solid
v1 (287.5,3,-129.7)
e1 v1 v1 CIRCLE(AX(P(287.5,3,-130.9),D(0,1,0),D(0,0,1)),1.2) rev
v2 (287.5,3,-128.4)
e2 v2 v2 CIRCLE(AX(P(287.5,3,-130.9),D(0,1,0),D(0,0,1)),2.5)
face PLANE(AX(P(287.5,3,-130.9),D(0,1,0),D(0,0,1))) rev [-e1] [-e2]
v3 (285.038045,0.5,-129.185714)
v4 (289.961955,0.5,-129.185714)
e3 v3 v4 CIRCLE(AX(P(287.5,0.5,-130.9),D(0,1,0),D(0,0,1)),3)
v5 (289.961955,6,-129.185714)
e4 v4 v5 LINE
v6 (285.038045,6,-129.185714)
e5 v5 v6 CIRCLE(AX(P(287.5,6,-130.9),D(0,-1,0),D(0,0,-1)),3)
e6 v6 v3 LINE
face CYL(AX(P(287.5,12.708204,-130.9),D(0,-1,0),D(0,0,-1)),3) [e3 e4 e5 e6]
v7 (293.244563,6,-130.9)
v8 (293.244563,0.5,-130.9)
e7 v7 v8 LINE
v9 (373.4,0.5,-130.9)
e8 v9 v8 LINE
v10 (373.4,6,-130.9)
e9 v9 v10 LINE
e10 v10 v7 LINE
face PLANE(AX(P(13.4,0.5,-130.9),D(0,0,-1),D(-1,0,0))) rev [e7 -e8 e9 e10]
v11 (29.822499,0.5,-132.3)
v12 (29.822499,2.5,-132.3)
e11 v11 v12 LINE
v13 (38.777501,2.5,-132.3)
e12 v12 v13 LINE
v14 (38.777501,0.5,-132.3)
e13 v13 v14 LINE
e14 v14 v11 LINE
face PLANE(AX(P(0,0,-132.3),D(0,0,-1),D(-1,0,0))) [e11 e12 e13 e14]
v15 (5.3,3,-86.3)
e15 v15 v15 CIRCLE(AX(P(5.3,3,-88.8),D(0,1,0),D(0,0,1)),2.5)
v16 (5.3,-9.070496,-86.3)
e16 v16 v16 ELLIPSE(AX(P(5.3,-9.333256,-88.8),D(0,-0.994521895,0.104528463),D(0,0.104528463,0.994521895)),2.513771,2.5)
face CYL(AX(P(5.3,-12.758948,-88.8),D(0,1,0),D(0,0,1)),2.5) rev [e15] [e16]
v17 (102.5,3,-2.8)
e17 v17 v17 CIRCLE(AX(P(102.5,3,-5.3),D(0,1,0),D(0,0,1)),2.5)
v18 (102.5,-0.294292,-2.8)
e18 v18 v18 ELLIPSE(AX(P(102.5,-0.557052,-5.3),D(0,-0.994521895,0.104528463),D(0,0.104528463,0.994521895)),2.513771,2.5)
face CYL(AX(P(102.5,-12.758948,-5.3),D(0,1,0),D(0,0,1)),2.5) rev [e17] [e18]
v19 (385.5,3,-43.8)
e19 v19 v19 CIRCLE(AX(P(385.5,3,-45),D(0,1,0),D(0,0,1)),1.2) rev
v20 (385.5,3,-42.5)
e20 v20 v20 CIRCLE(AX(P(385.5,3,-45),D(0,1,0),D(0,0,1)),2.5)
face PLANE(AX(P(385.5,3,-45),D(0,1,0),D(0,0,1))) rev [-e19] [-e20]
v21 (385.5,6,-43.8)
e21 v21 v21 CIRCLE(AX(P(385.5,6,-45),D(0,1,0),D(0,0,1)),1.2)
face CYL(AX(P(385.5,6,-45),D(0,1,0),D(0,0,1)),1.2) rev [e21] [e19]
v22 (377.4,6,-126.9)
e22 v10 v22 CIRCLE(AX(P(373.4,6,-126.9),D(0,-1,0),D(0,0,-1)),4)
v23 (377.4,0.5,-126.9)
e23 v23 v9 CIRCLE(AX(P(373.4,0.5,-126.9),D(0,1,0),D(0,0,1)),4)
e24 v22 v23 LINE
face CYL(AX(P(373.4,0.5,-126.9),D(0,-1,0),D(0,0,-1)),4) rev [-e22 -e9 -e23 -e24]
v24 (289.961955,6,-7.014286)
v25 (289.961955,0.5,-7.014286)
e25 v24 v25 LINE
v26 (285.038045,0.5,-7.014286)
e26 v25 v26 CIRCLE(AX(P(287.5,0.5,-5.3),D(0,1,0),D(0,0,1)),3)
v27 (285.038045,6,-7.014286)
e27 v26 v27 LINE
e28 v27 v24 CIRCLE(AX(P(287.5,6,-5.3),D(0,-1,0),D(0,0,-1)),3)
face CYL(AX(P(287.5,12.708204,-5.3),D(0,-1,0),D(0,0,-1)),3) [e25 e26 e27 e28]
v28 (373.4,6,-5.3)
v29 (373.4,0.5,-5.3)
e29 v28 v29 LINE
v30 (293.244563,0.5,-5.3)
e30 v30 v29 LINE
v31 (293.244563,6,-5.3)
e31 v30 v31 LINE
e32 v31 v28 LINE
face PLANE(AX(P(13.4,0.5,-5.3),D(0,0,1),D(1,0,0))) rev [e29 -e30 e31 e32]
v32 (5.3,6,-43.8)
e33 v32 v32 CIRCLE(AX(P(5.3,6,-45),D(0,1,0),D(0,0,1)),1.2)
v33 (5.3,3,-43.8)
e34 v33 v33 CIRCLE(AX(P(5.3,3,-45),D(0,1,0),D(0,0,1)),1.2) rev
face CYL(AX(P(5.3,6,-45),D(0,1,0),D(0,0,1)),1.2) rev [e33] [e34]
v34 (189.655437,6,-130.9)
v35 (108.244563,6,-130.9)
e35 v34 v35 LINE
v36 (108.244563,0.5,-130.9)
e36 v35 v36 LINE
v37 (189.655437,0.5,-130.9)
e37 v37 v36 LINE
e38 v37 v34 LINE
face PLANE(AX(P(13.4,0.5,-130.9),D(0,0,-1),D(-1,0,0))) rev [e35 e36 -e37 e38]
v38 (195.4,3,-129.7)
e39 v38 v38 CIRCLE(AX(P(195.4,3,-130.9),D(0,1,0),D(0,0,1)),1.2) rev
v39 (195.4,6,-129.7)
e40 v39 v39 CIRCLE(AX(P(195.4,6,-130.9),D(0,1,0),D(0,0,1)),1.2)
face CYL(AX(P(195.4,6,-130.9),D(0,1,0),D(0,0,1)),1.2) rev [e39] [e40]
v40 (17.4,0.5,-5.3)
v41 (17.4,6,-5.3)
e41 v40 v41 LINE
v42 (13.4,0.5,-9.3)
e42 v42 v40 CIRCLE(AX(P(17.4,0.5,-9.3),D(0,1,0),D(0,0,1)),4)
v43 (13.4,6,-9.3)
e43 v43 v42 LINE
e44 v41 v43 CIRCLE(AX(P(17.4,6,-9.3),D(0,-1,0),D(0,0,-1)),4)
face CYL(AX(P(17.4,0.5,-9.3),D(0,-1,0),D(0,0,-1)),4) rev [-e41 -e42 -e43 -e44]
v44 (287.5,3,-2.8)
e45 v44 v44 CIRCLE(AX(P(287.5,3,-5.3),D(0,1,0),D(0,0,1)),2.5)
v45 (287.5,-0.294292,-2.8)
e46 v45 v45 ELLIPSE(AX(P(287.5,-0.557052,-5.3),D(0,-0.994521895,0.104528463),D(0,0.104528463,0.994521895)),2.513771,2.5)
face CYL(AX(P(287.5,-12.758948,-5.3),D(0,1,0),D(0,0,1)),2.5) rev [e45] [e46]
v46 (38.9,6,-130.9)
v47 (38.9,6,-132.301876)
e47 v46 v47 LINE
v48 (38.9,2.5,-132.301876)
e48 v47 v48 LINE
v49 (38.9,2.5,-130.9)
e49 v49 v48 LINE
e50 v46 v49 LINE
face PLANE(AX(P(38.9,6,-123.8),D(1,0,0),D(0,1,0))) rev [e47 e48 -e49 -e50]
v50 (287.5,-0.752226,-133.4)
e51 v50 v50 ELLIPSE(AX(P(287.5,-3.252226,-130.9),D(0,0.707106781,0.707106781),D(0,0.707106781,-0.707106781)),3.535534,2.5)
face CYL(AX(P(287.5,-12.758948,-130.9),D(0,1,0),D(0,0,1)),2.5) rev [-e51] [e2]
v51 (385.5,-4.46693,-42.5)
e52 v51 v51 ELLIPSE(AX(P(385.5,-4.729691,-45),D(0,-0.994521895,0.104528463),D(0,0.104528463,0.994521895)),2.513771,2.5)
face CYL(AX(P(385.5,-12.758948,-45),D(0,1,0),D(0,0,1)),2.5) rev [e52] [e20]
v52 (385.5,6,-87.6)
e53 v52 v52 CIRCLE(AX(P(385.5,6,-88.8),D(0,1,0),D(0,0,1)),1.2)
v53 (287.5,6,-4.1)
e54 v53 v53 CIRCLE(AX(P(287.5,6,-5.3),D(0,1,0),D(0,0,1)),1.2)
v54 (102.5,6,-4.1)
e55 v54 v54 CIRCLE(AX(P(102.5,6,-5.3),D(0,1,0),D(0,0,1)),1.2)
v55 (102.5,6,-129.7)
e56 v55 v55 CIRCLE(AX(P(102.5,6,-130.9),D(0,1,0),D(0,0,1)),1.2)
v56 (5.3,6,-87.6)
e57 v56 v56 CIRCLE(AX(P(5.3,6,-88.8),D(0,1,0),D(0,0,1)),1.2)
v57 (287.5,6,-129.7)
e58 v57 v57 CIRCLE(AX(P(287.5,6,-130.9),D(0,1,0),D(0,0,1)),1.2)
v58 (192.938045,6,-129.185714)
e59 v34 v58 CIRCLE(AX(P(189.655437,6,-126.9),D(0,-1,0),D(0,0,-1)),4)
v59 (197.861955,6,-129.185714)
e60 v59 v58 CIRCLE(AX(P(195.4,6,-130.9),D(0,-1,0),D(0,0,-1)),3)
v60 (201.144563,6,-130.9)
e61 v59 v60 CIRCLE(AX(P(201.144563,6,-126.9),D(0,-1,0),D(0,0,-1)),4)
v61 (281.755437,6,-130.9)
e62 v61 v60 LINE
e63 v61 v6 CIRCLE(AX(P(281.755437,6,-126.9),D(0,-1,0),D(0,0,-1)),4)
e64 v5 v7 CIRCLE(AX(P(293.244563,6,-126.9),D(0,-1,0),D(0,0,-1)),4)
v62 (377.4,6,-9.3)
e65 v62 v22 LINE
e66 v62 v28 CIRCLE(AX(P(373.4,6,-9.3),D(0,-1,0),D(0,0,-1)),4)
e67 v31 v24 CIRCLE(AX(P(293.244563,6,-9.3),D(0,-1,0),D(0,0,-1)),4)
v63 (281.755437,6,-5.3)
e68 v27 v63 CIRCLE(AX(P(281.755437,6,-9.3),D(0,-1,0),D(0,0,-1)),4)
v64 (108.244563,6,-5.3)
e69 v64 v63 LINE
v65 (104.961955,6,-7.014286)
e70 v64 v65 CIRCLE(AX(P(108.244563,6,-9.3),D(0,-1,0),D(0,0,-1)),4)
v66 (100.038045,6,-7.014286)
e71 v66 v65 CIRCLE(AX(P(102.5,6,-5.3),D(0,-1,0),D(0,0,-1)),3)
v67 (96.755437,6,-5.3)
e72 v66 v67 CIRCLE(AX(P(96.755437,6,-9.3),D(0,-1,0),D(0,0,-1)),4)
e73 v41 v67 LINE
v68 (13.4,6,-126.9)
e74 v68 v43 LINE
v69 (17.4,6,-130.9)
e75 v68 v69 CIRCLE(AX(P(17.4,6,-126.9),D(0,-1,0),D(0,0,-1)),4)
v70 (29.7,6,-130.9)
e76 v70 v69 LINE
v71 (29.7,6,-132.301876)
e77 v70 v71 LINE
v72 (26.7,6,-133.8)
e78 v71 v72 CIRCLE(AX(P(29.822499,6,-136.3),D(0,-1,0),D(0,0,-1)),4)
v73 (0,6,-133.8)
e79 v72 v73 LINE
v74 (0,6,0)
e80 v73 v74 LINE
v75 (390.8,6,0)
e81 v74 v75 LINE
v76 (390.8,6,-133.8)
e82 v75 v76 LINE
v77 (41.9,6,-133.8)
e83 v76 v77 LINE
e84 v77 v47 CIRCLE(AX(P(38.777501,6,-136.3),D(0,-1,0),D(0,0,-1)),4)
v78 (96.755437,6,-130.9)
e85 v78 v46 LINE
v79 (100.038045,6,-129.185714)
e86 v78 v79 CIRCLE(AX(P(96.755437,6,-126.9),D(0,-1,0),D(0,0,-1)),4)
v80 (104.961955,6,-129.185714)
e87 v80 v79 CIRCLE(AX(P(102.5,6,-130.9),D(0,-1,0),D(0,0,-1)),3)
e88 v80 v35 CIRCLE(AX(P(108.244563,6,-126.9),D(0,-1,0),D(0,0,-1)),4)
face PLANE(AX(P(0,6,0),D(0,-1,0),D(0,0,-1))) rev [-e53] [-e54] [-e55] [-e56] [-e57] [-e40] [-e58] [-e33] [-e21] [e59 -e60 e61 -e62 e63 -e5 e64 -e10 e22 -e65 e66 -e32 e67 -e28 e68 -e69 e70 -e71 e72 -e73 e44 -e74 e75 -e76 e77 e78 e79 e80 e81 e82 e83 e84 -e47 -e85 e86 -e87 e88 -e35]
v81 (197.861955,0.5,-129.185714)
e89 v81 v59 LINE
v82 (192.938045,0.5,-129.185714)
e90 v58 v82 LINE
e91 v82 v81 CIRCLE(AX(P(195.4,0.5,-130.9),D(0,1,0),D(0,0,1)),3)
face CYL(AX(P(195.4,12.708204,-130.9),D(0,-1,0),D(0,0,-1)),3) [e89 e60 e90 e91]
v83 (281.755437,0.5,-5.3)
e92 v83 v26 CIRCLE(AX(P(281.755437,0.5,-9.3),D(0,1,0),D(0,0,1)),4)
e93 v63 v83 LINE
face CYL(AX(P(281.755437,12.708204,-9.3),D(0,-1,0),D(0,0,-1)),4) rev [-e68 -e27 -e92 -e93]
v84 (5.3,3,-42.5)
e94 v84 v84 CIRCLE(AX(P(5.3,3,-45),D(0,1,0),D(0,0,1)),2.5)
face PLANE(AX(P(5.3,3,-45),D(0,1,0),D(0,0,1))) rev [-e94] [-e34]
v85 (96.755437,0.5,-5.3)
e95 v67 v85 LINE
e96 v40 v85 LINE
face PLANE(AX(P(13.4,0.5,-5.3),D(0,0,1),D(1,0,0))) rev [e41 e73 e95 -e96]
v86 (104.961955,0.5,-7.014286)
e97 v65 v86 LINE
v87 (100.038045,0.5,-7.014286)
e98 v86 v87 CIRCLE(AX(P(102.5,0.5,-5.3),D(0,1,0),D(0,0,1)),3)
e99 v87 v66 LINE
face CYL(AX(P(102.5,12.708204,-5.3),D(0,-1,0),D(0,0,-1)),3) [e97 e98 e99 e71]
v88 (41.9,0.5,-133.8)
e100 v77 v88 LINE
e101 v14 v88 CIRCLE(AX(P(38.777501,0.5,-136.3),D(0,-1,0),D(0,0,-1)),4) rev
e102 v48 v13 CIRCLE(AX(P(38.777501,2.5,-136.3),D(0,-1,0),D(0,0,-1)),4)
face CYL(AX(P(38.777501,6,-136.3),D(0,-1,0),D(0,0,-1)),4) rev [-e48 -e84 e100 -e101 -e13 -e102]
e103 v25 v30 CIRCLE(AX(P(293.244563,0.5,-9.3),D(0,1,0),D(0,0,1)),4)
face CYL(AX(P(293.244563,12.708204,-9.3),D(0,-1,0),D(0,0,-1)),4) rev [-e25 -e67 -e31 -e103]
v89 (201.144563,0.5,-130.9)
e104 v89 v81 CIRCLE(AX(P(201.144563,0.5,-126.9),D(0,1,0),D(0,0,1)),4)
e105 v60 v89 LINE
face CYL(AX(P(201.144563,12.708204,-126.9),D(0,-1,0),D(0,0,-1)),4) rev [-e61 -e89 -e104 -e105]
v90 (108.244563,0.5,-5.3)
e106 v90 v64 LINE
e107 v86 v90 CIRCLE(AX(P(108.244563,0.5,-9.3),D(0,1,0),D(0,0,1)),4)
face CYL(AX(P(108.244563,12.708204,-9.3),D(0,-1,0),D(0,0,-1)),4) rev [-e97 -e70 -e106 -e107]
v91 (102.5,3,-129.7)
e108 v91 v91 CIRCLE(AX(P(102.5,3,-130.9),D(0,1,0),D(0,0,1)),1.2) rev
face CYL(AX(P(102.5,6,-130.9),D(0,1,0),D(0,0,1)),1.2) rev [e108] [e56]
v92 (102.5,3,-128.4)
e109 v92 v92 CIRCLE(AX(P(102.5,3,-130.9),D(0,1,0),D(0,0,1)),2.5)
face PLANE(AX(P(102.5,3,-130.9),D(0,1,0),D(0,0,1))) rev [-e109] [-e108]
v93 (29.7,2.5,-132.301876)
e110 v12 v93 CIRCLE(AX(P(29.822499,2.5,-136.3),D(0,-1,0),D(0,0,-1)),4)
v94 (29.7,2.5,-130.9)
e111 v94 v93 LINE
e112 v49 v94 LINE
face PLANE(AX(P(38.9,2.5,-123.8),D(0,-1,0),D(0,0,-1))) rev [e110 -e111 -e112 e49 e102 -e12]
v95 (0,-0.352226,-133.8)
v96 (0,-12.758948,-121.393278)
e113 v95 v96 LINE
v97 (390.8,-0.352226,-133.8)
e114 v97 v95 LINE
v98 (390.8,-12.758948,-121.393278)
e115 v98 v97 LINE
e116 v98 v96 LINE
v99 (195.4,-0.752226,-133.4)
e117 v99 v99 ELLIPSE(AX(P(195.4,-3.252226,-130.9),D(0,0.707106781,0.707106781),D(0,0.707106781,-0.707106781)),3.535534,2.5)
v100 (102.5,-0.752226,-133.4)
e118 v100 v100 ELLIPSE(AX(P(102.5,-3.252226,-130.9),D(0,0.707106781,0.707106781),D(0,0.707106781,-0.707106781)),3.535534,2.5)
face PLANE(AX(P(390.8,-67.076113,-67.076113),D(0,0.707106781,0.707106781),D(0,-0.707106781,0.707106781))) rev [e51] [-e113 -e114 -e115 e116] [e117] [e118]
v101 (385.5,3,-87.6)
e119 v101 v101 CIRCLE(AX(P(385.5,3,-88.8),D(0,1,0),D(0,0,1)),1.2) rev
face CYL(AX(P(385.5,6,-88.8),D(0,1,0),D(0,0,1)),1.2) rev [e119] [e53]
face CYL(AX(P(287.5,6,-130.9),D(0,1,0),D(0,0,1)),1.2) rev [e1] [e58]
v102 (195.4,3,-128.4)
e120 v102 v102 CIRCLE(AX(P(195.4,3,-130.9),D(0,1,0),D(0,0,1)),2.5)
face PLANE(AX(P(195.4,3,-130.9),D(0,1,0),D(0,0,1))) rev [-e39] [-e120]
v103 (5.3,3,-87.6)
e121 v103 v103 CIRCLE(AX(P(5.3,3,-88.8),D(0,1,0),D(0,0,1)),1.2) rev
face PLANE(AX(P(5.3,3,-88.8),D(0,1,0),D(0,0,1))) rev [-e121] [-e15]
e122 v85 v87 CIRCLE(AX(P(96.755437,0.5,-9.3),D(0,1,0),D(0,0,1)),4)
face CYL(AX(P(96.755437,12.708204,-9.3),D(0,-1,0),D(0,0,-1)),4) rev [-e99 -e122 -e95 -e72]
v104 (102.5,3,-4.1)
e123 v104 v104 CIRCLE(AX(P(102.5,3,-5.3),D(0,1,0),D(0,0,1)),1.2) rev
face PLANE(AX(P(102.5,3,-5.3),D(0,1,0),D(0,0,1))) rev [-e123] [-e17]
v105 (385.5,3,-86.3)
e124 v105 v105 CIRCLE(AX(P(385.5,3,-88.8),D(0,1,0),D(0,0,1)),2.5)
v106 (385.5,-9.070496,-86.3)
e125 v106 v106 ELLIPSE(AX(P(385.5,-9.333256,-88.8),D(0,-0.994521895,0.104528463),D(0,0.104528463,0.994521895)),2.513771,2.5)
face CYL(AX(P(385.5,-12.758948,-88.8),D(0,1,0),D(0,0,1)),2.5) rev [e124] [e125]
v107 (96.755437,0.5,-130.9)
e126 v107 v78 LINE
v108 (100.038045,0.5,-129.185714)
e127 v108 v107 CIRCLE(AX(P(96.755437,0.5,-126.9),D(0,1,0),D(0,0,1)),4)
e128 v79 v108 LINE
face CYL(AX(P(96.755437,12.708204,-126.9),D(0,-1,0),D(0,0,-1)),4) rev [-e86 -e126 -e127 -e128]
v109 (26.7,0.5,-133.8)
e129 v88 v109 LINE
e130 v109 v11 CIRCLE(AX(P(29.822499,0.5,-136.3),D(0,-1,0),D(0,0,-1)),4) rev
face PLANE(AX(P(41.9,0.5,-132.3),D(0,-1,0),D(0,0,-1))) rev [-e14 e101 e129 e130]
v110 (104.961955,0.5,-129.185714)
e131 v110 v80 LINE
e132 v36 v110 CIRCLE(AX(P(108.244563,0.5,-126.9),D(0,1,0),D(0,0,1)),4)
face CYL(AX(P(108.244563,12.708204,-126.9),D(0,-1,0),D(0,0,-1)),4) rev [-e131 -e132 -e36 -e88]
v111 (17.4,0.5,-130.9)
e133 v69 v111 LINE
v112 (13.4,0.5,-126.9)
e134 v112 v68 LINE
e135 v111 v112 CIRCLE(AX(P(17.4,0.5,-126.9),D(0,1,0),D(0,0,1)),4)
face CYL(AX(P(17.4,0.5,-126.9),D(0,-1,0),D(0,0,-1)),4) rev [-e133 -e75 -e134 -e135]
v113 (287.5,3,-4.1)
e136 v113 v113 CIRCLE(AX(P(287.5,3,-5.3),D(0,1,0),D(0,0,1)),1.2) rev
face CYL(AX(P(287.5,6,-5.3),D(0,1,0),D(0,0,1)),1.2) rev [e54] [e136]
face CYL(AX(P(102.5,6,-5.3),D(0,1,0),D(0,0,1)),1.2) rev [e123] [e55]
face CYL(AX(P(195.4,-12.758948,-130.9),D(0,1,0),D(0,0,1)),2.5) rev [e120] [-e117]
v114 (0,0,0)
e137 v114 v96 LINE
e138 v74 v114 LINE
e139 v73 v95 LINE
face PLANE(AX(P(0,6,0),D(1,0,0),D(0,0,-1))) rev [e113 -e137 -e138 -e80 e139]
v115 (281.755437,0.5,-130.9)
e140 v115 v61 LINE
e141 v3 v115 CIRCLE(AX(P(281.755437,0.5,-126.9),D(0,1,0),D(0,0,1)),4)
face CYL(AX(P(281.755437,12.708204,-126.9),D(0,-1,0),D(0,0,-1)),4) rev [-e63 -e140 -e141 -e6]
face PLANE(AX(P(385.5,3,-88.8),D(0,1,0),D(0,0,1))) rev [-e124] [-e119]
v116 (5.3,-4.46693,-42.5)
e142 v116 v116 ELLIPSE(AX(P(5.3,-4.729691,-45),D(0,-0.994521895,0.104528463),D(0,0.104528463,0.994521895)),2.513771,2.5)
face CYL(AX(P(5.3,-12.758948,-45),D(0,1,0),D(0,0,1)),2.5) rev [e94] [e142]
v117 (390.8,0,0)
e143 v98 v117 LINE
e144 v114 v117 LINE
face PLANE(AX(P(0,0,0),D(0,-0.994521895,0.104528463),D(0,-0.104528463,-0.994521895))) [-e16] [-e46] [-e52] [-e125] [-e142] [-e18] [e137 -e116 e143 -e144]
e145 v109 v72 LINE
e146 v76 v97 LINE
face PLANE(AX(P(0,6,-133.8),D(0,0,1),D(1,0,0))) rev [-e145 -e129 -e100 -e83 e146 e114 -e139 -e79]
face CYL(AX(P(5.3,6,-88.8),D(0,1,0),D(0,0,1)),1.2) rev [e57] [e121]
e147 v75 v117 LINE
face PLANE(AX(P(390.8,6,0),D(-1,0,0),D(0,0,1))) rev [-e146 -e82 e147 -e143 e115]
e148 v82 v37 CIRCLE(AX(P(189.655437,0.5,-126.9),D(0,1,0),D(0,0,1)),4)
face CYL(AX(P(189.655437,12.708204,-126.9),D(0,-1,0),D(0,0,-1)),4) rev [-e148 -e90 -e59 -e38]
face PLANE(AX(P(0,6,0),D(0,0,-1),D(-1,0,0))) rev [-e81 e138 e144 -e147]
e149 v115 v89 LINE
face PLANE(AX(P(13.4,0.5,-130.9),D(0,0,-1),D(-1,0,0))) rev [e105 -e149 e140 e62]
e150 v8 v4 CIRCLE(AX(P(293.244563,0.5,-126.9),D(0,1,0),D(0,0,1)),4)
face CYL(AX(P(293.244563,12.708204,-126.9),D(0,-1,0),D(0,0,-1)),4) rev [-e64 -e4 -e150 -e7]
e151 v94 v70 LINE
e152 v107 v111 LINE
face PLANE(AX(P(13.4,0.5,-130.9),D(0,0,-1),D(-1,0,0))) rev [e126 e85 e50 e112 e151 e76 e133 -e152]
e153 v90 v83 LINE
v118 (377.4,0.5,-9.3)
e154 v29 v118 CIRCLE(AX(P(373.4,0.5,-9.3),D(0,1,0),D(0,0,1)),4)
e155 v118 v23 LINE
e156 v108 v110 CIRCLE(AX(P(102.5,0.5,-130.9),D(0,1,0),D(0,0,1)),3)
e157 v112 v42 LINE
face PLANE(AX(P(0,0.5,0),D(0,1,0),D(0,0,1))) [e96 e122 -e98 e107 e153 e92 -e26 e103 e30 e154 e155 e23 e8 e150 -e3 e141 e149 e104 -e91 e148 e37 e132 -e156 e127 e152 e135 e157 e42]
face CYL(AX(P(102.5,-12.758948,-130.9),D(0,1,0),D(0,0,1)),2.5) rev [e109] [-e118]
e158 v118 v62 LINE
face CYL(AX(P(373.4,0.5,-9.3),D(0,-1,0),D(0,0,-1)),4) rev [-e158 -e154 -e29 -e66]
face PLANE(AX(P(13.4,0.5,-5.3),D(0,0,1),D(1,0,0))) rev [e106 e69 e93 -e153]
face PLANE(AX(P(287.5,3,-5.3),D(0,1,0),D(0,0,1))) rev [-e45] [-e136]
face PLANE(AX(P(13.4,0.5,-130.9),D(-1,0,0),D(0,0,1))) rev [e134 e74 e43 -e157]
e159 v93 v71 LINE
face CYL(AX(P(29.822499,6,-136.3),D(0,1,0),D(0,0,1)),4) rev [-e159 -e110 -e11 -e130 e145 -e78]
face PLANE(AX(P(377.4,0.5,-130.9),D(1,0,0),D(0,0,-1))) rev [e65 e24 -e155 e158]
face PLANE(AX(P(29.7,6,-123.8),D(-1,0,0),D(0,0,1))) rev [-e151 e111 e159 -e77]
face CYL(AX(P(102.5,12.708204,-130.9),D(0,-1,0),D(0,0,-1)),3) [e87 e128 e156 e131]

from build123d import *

# Parameters (mm, degrees)
SKETCH1_W               = 390.8
SKETCH1_H               = 133.8
BOSS_EXTRUDE1_DEPTH     = 6
SKETCH2_W               = 364
SKETCH2_H               = 125.6
CUT_EXTRUDE1_DEPTH      = 5.5
BOSS_EXTRUDE3_DEPTH     = 390.8
SKETCH8_W               = 9.2
SKETCH8_H               = 3.5
CUT_EXTRUDE2_DEPTH      = 10
BOSS_EXTRUDE4_DEPTH     = 5.5
SKETCH11_W              = 15.2
SKETCH11_H              = 5.5
CUT_EXTRUDE3_DEPTH      = 1.5
CUT_EXTRUDE6_DEPTH      = 414.309625425
CUT_EXTRUDE6_DEPTH_BACK = 414.309625425
FILLET1_R               = 4
M2_CLEARANCE_HOLE1_D    = 2.4
CUT_EXTRUDE7_START      = -3
SKETCH13_R              = 2.5
CUT_EXTRUDE7_DEPTH      = 411.496043655
FILLET2_R               = 4


with BuildPart() as part:
    # Sketch1 → Boss-Extrude1 (new body)
    with BuildSketch(Plane(origin=(0, 0, 0), x_dir=(1, 0, 0), z_dir=(0, 1, 0))):
        with Locations((195.4, 66.9)):
            Rectangle(SKETCH1_W, SKETCH1_H)
    extrude(amount=BOSS_EXTRUDE1_DEPTH)

    # Sketch2 → Cut-Extrude1 (cut)
    with BuildSketch(Plane(origin=(0, 6, 0), x_dir=(1, 0, 0), z_dir=(0, 1, 0))):
        with Locations((195.4, 68.1)):
            Rectangle(SKETCH2_W, SKETCH2_H)
    extrude(amount=-CUT_EXTRUDE1_DEPTH, mode=Mode.SUBTRACT)

    # Boss-Extrude3: read off the stored shape, not the designer's step
    # Boss-Extrude3 outline → Boss-Extrude3 (add)
    with BuildSketch(Plane.YZ):
        Polygon((-14.062946679, -133.8), (0, -133.8), (0, 0), align=None)
    extrude(amount=BOSS_EXTRUDE3_DEPTH)

    # Sketch8 → Cut-Extrude2 (cut)
    with BuildSketch(Plane(origin=(0, 0, -133.8), x_dir=(-1, 0, 0), z_dir=(0, 0, -1))):
        with Locations((-34.3, 4.25)):
            Rectangle(SKETCH8_W, SKETCH8_H)
    extrude(amount=-CUT_EXTRUDE2_DEPTH, mode=Mode.SUBTRACT)

    # Sketch10 → Boss-Extrude4 (add)
    with BuildSketch(Plane(origin=(0, 0.5, 0), x_dir=(1, 0, 0), z_dir=(0, 1, 0))):
        with BuildLine():
            Line((99.5, 5.3), (105.5, 5.3))
            ThreePointArc((105.5, 5.3), (102.5, 8.3), (99.5, 5.3))
        make_face()
        with BuildLine():
            ThreePointArc((290.5, 5.3), (287.5, 8.3), (284.5, 5.3))
            Line((284.5, 5.3), (290.5, 5.3))
        make_face()
        with BuildLine():
            Line((105.5, 130.9), (99.5, 130.9))
            ThreePointArc((99.5, 130.9), (102.5, 127.9), (105.5, 130.9))
        make_face()
        with BuildLine():
            ThreePointArc((284.5, 130.9), (287.5, 127.9), (290.5, 130.9))
            Line((290.5, 130.9), (284.5, 130.9))
        make_face()
        with BuildLine():
            Line((198.4, 130.9), (192.4, 130.9))
            ThreePointArc((192.4, 130.9), (195.4, 127.9), (198.4, 130.9))
        make_face()
    extrude(amount=BOSS_EXTRUDE4_DEPTH)

    # Sketch11 → Cut-Extrude3 (cut)
    with BuildSketch(Plane(origin=(0, 0, -133.8), x_dir=(-1, 0, 0), z_dir=(0, 0, -1))):
        with Locations((-34.3, 3.25)):
            Rectangle(SKETCH11_W, SKETCH11_H)
    extrude(amount=-CUT_EXTRUDE3_DEPTH, mode=Mode.SUBTRACT)

    # Sketch12 → Cut-Extrude6 (cut, two sides: drawn at the far end of the back side and taken through both)
    with BuildSketch(Plane.ZY.offset(-CUT_EXTRUDE6_DEPTH_BACK)):
        Polygon((-133.8, -14.062946679), (-121.393278428, -12.758947696), (-133.8, -0.352226124), align=None)
    extrude(amount=CUT_EXTRUDE6_DEPTH + CUT_EXTRUDE6_DEPTH_BACK, mode=Mode.SUBTRACT)

    # Fillet1
    fillet1_edges = [part.edges().sort_by_distance(p)[0] for p in [
        (13.4, 3.25, -5.3),
        (13.4, 3.25, -130.9),
        (377.4, 3.25, -130.9),
        (377.4, 3.25, -5.3),
        (99.5, 3.25, -130.9),
        (105.5, 3.25, -130.9),
        (192.4, 3.25, -130.9),
        (198.4, 3.25, -130.9),
        (284.5, 3.25, -130.9),
        (290.5, 3.25, -130.9),
        (290.5, 3.25, -5.3),
        (284.5, 3.25, -5.3),
        (105.5, 3.25, -5.3),
        (99.5, 3.25, -5.3),
    ]]
    fillet(fillet1_edges, radius=FILLET1_R)

    # M2 Clearance Hole1 (through all)
    with Locations(Plane(origin=(102.5, 6, -5.3), x_dir=(0, 0, 1), z_dir=(0, 1, 0))):
        with Locations((0, 0), (-39.7, -97.2), (-83.5, -97.2), (-125.6, 0), (-125.6, 92.9), (-125.6, 185), (-83.5, 283), (-39.7, 283), (0, 185)):
            Hole(M2_CLEARANCE_HOLE1_D / 2)

    # Sketch13 → Cut-Extrude7 (cut, through all)
    with BuildSketch(Plane(origin=(0, 6, 0), x_dir=(1, 0, 0), z_dir=(0, 1, 0)).offset(CUT_EXTRUDE7_START)):
        with Locations(Location((5.3, 45, 0), (0, 0, 270))):
            Circle(SKETCH13_R)
        with Locations(Location((5.3, 88.8, 0), (0, 0, 270))):
            Circle(SKETCH13_R)
        with Locations(Location((102.5, 5.3, 0), (0, 0, 270))):
            Circle(SKETCH13_R)
        with Locations(Location((287.5, 5.3, 0), (0, 0, 270))):
            Circle(SKETCH13_R)
        with Locations(Location((385.5, 45, 0), (0, 0, 270))):
            Circle(SKETCH13_R)
        with Locations(Location((385.5, 88.8, 0), (0, 0, 270))):
            Circle(SKETCH13_R)
        with Locations(Location((287.5, 130.9, 0), (0, 0, 270))):
            Circle(SKETCH13_R)
        with Locations(Location((195.4, 130.9, 0), (0, 0, 270))):
            Circle(SKETCH13_R)
        with Locations(Location((102.5, 130.9, 0), (0, 0, 270))):
            Circle(SKETCH13_R)
    extrude(amount=-CUT_EXTRUDE7_DEPTH, mode=Mode.SUBTRACT)

    # Fillet2
    # the kernel refuses this fillet: 4 mm, written as the material it adds along each edge
    with BuildSketch(Plane(origin=(41.9, -7.306247498, -132.3), x_dir=(-1, 0, 0), z_dir=(0, 1, 0))) as fillet2_piece_1_section:
        with BuildLine():
            CenterArc((3.122498999, -4), FILLET2_R, 90, 51.317812547)
            Line((0, -1.5), (0, 0))
            Line((0, 0), (3.122498999, 0))
        make_face()
    fillet2_piece_1 = extrude(amount=21.112494996, mode=Mode.PRIVATE)
    fillet2_piece_1 = split(fillet2_piece_1, bisect_by=Plane(origin=(41.9, 2.5, -132.3), z_dir=(0, -1, 0)), keep=Keep.TOP, mode=Mode.PRIVATE)
    fillet2_piece_1 = split(fillet2_piece_1, bisect_by=Plane(origin=(41.9, -4.579236811, -129.572989313), z_dir=(0, 0.7071067811865451, 0.70710678118655)), keep=Keep.TOP, mode=Mode.PRIVATE)
    add(fillet2_piece_1)
    with BuildSketch(Plane(origin=(41.9, -7.306247498, -132.3), x_dir=(-1, 0, 0), z_dir=(0, 1, 0))) as fillet2_piece_2_section:
        with BuildLine():
            CenterArc((3.122498999, -4), FILLET2_R, 90, 51.317812547)
            Line((0, -1.5), (0, 0))
            Line((0, 0), (3.122498999, 0))
        make_face()
    fillet2_piece_2 = extrude(amount=13.306247498, mode=Mode.PRIVATE)
    fillet2_piece_2 = split(fillet2_piece_2, bisect_by=Plane(origin=(38.9, -7.306247498, -132.3), z_dir=(1, 0, 0)), keep=Keep.TOP, mode=Mode.PRIVATE)
    fillet2_piece_2 = split(fillet2_piece_2, bisect_by=Plane(origin=(41.9, -4.579236811, -129.572989313), z_dir=(0, 0.7071067811865451, 0.70710678118655)), keep=Keep.TOP, mode=Mode.PRIVATE)
    add(fillet2_piece_2)
    with BuildSketch(Plane(origin=(26.7, 6, -132.3), x_dir=(1, 0, 0), z_dir=(0, -1, 0))) as fillet2_piece_3_section:
        with BuildLine():
            CenterArc((3.122498999, -4), FILLET2_R, 90, 51.317812547)
            Line((0, -1.5), (0, 0))
            Line((0, 0), (3.122498999, 0))
        make_face()
    fillet2_piece_3 = extrude(amount=13.306247498, mode=Mode.PRIVATE)
    fillet2_piece_3 = split(fillet2_piece_3, bisect_by=Plane(origin=(29.7, 6, -132.3), z_dir=(-1, 0, 0)), keep=Keep.TOP, mode=Mode.PRIVATE)
    fillet2_piece_3 = split(fillet2_piece_3, bisect_by=Plane(origin=(26.7, 2.073886938, -136.226113062), z_dir=(0, 0.7071067811865451, 0.70710678118655)), keep=Keep.TOP, mode=Mode.PRIVATE)
    add(fillet2_piece_3)
    with BuildSketch(Plane(origin=(26.7, 13.806247498, -132.3), x_dir=(1, 0, 0), z_dir=(0, -1, 0))) as fillet2_piece_4_section:
        with BuildLine():
            CenterArc((3.122498999, -4), FILLET2_R, 90, 51.317812547)
            Line((0, -1.5), (0, 0))
            Line((0, 0), (3.122498999, 0))
        make_face()
    fillet2_piece_4 = extrude(amount=21.112494996, mode=Mode.PRIVATE)
    fillet2_piece_4 = split(fillet2_piece_4, bisect_by=Plane(origin=(26.7, 2.5, -132.3), z_dir=(0, -1, 0)), keep=Keep.TOP, mode=Mode.PRIVATE)
    fillet2_piece_4 = split(fillet2_piece_4, bisect_by=Plane(origin=(26.7, 5.977010687, -140.129236811), z_dir=(0, 0.7071067811865451, 0.70710678118655)), keep=Keep.TOP, mode=Mode.PRIVATE)
    add(fillet2_piece_4)


solid = part.part
